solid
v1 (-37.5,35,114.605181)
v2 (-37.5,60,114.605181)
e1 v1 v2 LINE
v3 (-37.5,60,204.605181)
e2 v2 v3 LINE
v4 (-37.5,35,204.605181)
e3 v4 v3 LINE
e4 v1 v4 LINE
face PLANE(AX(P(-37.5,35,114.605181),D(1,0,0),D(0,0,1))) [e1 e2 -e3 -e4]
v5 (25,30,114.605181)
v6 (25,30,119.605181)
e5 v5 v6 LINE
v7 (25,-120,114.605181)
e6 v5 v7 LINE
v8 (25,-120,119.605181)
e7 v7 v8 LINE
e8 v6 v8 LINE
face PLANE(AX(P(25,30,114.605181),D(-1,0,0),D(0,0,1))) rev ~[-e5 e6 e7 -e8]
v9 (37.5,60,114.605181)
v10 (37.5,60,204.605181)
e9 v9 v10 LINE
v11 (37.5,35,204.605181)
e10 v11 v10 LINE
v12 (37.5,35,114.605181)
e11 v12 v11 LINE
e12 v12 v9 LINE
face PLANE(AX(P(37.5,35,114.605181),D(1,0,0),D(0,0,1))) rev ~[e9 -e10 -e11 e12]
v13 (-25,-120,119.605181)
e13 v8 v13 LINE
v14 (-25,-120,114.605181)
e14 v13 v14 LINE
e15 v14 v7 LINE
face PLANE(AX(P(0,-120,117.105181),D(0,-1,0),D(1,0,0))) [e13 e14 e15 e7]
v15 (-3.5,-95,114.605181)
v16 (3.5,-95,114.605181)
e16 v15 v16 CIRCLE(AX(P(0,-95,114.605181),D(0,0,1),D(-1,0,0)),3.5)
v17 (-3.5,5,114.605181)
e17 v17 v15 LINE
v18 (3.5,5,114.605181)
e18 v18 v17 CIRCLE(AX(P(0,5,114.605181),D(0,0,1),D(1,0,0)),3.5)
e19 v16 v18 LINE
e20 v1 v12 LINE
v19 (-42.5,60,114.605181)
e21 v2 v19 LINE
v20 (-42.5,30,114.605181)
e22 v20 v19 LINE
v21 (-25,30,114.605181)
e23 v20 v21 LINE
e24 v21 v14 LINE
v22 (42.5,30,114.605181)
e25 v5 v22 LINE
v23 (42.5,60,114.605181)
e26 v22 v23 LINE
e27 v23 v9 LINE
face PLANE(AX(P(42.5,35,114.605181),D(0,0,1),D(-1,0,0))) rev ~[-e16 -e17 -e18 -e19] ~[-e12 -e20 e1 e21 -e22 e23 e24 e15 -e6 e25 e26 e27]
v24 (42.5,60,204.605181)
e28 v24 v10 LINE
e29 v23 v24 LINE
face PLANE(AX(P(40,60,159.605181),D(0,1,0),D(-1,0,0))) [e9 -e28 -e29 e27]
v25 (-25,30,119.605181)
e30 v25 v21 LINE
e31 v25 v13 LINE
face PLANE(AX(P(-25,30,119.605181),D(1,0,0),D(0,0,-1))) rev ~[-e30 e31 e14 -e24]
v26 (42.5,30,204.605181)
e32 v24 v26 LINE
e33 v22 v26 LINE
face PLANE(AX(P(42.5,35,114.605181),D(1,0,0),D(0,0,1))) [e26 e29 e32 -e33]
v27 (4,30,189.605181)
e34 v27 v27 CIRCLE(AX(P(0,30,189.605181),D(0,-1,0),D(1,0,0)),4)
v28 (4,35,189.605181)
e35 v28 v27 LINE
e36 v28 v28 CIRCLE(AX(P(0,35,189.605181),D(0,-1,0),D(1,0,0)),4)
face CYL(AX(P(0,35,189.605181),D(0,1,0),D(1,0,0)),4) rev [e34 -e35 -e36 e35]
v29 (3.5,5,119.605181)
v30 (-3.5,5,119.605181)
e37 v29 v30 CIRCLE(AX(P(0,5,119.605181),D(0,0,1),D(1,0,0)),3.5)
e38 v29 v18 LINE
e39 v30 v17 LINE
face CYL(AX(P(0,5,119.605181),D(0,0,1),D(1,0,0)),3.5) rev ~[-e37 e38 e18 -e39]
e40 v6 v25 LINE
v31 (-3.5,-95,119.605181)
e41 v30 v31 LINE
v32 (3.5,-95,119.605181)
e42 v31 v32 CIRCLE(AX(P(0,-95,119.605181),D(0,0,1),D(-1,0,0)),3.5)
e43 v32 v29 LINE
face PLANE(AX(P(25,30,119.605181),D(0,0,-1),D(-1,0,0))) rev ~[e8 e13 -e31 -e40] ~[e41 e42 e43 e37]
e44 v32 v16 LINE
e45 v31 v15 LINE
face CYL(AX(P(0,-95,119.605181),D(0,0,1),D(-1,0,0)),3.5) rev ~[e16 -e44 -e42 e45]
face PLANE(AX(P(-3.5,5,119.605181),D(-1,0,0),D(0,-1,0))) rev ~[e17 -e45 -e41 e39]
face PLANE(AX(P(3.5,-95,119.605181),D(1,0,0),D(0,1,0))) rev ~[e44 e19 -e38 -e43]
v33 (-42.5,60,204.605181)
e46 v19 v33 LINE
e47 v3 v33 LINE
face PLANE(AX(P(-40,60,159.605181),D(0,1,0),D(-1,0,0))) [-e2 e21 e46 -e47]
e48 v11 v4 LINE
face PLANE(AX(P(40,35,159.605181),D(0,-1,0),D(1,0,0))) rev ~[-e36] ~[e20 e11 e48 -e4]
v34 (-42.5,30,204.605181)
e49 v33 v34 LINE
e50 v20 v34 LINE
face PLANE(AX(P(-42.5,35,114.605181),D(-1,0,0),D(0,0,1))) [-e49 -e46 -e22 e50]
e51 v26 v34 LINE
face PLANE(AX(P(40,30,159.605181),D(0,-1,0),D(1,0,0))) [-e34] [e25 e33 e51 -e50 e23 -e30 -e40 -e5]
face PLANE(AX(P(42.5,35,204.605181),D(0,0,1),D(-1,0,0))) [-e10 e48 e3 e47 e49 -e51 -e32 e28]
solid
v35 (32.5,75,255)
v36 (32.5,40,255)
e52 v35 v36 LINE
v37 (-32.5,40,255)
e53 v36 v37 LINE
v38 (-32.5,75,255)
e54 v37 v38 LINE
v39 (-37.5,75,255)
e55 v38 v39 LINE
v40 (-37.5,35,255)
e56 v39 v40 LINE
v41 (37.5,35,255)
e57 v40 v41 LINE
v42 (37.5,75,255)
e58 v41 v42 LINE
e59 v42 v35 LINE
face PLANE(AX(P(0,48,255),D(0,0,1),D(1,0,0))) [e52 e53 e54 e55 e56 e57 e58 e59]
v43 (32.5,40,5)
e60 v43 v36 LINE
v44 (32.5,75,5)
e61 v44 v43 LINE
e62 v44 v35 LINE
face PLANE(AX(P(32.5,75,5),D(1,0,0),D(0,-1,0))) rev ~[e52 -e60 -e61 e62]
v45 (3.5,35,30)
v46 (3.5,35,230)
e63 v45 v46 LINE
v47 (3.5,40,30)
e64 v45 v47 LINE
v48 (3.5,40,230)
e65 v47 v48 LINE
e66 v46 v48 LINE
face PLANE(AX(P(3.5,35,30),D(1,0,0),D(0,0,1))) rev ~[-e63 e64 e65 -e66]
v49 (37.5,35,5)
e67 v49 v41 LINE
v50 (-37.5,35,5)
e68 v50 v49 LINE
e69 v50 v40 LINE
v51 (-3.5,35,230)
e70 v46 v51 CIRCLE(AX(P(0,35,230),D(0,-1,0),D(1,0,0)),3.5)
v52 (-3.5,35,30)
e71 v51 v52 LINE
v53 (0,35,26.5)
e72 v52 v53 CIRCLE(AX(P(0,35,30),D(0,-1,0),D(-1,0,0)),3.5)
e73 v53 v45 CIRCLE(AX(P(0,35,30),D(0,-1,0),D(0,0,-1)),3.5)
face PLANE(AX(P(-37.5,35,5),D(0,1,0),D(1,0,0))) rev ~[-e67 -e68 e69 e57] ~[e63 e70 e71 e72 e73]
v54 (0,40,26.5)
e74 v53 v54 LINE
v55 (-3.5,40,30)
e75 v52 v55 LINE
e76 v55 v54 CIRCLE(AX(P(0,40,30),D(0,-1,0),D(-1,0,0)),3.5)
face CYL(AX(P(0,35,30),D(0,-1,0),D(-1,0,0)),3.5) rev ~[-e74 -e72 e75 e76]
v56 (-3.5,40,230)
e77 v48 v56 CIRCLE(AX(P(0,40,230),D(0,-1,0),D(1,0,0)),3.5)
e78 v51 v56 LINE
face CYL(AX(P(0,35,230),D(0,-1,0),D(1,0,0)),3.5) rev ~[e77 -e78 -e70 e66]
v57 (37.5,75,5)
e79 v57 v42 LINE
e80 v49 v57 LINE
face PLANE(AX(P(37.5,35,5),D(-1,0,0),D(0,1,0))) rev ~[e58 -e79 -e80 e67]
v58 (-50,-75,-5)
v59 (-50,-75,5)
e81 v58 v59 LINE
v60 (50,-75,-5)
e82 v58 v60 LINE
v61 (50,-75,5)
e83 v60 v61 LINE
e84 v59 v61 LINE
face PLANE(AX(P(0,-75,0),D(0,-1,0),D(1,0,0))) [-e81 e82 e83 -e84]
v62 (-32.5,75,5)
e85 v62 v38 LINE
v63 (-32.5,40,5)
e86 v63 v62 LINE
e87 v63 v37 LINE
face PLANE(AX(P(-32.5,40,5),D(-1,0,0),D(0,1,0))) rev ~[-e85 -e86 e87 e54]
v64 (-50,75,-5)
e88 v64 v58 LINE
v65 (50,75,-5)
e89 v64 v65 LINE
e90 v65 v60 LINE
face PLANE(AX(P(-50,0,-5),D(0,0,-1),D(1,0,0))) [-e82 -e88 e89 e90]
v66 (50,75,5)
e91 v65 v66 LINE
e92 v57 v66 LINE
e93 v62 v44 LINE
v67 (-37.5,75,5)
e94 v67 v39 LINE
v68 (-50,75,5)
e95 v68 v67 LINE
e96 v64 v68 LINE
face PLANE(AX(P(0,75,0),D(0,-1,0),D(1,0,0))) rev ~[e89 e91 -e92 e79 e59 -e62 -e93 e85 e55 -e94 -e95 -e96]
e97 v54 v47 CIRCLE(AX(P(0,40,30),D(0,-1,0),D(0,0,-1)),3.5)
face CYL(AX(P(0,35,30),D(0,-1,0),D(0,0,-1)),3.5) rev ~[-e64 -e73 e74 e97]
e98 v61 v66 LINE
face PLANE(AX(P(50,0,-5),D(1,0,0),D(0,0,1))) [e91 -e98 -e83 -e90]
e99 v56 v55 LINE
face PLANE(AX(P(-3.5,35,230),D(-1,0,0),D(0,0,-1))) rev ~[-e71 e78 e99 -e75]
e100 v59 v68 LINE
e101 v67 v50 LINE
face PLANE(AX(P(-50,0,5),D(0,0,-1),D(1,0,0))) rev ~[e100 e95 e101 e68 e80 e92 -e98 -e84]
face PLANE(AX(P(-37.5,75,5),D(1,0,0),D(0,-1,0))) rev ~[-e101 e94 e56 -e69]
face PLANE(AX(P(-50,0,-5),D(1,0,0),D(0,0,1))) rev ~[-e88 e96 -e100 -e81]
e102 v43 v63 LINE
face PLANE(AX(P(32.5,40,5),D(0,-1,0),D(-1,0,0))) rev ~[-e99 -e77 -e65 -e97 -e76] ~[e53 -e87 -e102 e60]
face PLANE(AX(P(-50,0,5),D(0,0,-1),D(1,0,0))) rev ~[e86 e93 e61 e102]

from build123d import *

# Parameters (mm, degrees)
F0_W      = 100
F0_H      = 10
F1_DEPTH  = 75
F3_DEPTH  = 250
F5_DEPTH  = 25
F6_W      = 5
F6_H      = 90
F6_W_2    = 75
F6_R      = 4
F7_DEPTH  = 5
F8_W      = 5
F8_H      = 90
F9_DEPTH  = 25
F11_DEPTH = 150
F13_DEPTH = 25


with BuildPart() as f1:
    # F0 (on Front) → F1 (new body, symmetric)
    with BuildSketch(Plane.XZ):
        Rectangle(F0_W, F0_H)
    extrude(amount=F1_DEPTH, both=True)

    # F2 (on face) → F3 (join)
    with BuildSketch(Plane.XY.offset(5)):
        Polygon((-32.5, 75), (-37.5, 75), (-37.5, 35), (0, 35), (37.5, 35), (37.5, 75), (32.5, 75), (32.5, 40), (-32.5, 40), align=None)
    extrude(amount=F3_DEPTH)

    # F4 (on face) → F5 (cut)
    with BuildSketch(Plane.XZ.offset(-35)):
        with BuildLine():
            ThreePointArc((-3.5, 30), (-2.4748737342, 27.5251262658), (0, 26.5))
            ThreePointArc((0, 26.5), (2.4748737342, 27.5251262658), (3.5, 30))
            Line((3.5, 30), (3.5, 230))
            ThreePointArc((3.5, 230), (0, 233.5), (-3.5, 230))
            Line((-3.5, 230), (-3.5, 30))
        make_face()
    extrude(amount=-F5_DEPTH, mode=Mode.SUBTRACT)


with BuildPart() as f7:
    # F6 (on face) → F7 (new body)
    with BuildSketch(Plane.XZ.offset(-35)):
        with Locations((40, 159.6051809192)):
            Rectangle(F6_W, F6_H)
        with Locations((0, 159.6051809192)):
            Rectangle(F6_W_2, F6_H)
        with Locations((0, 189.6051809192)):
            Circle(F6_R, mode=Mode.SUBTRACT)
        with Locations((-40, 159.6051809192)):
            Rectangle(F6_W, F6_H)
    extrude(amount=F7_DEPTH)

    # F8 (on face) → F9 (join)
    with BuildSketch(Plane(origin=(0, 35, 0), x_dir=(-1, 0, 0), z_dir=(0, 1, 0))):
        with Locations((-40, 159.6051809192)):
            Rectangle(F8_W, F8_H)
        with Locations((40, 159.6051809192)):
            Rectangle(F8_W, F8_H)
    extrude(amount=F9_DEPTH)

    # F10 (on face) → F11 (join)
    with BuildSketch(Plane.XZ.offset(-30)):
        Polygon((25, 119.6051809192), (0, 119.6051809192), (-25, 119.6051809192), (-25, 114.6051809192), (25, 114.6051809192), align=None)
    extrude(amount=F11_DEPTH)

    # F12 (on face) → F13 (cut)
    with BuildSketch(Plane.XY.offset(119.6051809192)):
        with BuildLine():
            ThreePointArc((-3.5, -95), (0, -98.5), (3.5, -95))
            Line((3.5, -95), (3.5, 5))
            ThreePointArc((3.5, 5), (0, 8.5), (-3.5, 5))
            Line((-3.5, 5), (-3.5, -95))
        make_face()
    extrude(amount=-F13_DEPTH, mode=Mode.SUBTRACT)


solid = Compound([f1.part, f7.part])
